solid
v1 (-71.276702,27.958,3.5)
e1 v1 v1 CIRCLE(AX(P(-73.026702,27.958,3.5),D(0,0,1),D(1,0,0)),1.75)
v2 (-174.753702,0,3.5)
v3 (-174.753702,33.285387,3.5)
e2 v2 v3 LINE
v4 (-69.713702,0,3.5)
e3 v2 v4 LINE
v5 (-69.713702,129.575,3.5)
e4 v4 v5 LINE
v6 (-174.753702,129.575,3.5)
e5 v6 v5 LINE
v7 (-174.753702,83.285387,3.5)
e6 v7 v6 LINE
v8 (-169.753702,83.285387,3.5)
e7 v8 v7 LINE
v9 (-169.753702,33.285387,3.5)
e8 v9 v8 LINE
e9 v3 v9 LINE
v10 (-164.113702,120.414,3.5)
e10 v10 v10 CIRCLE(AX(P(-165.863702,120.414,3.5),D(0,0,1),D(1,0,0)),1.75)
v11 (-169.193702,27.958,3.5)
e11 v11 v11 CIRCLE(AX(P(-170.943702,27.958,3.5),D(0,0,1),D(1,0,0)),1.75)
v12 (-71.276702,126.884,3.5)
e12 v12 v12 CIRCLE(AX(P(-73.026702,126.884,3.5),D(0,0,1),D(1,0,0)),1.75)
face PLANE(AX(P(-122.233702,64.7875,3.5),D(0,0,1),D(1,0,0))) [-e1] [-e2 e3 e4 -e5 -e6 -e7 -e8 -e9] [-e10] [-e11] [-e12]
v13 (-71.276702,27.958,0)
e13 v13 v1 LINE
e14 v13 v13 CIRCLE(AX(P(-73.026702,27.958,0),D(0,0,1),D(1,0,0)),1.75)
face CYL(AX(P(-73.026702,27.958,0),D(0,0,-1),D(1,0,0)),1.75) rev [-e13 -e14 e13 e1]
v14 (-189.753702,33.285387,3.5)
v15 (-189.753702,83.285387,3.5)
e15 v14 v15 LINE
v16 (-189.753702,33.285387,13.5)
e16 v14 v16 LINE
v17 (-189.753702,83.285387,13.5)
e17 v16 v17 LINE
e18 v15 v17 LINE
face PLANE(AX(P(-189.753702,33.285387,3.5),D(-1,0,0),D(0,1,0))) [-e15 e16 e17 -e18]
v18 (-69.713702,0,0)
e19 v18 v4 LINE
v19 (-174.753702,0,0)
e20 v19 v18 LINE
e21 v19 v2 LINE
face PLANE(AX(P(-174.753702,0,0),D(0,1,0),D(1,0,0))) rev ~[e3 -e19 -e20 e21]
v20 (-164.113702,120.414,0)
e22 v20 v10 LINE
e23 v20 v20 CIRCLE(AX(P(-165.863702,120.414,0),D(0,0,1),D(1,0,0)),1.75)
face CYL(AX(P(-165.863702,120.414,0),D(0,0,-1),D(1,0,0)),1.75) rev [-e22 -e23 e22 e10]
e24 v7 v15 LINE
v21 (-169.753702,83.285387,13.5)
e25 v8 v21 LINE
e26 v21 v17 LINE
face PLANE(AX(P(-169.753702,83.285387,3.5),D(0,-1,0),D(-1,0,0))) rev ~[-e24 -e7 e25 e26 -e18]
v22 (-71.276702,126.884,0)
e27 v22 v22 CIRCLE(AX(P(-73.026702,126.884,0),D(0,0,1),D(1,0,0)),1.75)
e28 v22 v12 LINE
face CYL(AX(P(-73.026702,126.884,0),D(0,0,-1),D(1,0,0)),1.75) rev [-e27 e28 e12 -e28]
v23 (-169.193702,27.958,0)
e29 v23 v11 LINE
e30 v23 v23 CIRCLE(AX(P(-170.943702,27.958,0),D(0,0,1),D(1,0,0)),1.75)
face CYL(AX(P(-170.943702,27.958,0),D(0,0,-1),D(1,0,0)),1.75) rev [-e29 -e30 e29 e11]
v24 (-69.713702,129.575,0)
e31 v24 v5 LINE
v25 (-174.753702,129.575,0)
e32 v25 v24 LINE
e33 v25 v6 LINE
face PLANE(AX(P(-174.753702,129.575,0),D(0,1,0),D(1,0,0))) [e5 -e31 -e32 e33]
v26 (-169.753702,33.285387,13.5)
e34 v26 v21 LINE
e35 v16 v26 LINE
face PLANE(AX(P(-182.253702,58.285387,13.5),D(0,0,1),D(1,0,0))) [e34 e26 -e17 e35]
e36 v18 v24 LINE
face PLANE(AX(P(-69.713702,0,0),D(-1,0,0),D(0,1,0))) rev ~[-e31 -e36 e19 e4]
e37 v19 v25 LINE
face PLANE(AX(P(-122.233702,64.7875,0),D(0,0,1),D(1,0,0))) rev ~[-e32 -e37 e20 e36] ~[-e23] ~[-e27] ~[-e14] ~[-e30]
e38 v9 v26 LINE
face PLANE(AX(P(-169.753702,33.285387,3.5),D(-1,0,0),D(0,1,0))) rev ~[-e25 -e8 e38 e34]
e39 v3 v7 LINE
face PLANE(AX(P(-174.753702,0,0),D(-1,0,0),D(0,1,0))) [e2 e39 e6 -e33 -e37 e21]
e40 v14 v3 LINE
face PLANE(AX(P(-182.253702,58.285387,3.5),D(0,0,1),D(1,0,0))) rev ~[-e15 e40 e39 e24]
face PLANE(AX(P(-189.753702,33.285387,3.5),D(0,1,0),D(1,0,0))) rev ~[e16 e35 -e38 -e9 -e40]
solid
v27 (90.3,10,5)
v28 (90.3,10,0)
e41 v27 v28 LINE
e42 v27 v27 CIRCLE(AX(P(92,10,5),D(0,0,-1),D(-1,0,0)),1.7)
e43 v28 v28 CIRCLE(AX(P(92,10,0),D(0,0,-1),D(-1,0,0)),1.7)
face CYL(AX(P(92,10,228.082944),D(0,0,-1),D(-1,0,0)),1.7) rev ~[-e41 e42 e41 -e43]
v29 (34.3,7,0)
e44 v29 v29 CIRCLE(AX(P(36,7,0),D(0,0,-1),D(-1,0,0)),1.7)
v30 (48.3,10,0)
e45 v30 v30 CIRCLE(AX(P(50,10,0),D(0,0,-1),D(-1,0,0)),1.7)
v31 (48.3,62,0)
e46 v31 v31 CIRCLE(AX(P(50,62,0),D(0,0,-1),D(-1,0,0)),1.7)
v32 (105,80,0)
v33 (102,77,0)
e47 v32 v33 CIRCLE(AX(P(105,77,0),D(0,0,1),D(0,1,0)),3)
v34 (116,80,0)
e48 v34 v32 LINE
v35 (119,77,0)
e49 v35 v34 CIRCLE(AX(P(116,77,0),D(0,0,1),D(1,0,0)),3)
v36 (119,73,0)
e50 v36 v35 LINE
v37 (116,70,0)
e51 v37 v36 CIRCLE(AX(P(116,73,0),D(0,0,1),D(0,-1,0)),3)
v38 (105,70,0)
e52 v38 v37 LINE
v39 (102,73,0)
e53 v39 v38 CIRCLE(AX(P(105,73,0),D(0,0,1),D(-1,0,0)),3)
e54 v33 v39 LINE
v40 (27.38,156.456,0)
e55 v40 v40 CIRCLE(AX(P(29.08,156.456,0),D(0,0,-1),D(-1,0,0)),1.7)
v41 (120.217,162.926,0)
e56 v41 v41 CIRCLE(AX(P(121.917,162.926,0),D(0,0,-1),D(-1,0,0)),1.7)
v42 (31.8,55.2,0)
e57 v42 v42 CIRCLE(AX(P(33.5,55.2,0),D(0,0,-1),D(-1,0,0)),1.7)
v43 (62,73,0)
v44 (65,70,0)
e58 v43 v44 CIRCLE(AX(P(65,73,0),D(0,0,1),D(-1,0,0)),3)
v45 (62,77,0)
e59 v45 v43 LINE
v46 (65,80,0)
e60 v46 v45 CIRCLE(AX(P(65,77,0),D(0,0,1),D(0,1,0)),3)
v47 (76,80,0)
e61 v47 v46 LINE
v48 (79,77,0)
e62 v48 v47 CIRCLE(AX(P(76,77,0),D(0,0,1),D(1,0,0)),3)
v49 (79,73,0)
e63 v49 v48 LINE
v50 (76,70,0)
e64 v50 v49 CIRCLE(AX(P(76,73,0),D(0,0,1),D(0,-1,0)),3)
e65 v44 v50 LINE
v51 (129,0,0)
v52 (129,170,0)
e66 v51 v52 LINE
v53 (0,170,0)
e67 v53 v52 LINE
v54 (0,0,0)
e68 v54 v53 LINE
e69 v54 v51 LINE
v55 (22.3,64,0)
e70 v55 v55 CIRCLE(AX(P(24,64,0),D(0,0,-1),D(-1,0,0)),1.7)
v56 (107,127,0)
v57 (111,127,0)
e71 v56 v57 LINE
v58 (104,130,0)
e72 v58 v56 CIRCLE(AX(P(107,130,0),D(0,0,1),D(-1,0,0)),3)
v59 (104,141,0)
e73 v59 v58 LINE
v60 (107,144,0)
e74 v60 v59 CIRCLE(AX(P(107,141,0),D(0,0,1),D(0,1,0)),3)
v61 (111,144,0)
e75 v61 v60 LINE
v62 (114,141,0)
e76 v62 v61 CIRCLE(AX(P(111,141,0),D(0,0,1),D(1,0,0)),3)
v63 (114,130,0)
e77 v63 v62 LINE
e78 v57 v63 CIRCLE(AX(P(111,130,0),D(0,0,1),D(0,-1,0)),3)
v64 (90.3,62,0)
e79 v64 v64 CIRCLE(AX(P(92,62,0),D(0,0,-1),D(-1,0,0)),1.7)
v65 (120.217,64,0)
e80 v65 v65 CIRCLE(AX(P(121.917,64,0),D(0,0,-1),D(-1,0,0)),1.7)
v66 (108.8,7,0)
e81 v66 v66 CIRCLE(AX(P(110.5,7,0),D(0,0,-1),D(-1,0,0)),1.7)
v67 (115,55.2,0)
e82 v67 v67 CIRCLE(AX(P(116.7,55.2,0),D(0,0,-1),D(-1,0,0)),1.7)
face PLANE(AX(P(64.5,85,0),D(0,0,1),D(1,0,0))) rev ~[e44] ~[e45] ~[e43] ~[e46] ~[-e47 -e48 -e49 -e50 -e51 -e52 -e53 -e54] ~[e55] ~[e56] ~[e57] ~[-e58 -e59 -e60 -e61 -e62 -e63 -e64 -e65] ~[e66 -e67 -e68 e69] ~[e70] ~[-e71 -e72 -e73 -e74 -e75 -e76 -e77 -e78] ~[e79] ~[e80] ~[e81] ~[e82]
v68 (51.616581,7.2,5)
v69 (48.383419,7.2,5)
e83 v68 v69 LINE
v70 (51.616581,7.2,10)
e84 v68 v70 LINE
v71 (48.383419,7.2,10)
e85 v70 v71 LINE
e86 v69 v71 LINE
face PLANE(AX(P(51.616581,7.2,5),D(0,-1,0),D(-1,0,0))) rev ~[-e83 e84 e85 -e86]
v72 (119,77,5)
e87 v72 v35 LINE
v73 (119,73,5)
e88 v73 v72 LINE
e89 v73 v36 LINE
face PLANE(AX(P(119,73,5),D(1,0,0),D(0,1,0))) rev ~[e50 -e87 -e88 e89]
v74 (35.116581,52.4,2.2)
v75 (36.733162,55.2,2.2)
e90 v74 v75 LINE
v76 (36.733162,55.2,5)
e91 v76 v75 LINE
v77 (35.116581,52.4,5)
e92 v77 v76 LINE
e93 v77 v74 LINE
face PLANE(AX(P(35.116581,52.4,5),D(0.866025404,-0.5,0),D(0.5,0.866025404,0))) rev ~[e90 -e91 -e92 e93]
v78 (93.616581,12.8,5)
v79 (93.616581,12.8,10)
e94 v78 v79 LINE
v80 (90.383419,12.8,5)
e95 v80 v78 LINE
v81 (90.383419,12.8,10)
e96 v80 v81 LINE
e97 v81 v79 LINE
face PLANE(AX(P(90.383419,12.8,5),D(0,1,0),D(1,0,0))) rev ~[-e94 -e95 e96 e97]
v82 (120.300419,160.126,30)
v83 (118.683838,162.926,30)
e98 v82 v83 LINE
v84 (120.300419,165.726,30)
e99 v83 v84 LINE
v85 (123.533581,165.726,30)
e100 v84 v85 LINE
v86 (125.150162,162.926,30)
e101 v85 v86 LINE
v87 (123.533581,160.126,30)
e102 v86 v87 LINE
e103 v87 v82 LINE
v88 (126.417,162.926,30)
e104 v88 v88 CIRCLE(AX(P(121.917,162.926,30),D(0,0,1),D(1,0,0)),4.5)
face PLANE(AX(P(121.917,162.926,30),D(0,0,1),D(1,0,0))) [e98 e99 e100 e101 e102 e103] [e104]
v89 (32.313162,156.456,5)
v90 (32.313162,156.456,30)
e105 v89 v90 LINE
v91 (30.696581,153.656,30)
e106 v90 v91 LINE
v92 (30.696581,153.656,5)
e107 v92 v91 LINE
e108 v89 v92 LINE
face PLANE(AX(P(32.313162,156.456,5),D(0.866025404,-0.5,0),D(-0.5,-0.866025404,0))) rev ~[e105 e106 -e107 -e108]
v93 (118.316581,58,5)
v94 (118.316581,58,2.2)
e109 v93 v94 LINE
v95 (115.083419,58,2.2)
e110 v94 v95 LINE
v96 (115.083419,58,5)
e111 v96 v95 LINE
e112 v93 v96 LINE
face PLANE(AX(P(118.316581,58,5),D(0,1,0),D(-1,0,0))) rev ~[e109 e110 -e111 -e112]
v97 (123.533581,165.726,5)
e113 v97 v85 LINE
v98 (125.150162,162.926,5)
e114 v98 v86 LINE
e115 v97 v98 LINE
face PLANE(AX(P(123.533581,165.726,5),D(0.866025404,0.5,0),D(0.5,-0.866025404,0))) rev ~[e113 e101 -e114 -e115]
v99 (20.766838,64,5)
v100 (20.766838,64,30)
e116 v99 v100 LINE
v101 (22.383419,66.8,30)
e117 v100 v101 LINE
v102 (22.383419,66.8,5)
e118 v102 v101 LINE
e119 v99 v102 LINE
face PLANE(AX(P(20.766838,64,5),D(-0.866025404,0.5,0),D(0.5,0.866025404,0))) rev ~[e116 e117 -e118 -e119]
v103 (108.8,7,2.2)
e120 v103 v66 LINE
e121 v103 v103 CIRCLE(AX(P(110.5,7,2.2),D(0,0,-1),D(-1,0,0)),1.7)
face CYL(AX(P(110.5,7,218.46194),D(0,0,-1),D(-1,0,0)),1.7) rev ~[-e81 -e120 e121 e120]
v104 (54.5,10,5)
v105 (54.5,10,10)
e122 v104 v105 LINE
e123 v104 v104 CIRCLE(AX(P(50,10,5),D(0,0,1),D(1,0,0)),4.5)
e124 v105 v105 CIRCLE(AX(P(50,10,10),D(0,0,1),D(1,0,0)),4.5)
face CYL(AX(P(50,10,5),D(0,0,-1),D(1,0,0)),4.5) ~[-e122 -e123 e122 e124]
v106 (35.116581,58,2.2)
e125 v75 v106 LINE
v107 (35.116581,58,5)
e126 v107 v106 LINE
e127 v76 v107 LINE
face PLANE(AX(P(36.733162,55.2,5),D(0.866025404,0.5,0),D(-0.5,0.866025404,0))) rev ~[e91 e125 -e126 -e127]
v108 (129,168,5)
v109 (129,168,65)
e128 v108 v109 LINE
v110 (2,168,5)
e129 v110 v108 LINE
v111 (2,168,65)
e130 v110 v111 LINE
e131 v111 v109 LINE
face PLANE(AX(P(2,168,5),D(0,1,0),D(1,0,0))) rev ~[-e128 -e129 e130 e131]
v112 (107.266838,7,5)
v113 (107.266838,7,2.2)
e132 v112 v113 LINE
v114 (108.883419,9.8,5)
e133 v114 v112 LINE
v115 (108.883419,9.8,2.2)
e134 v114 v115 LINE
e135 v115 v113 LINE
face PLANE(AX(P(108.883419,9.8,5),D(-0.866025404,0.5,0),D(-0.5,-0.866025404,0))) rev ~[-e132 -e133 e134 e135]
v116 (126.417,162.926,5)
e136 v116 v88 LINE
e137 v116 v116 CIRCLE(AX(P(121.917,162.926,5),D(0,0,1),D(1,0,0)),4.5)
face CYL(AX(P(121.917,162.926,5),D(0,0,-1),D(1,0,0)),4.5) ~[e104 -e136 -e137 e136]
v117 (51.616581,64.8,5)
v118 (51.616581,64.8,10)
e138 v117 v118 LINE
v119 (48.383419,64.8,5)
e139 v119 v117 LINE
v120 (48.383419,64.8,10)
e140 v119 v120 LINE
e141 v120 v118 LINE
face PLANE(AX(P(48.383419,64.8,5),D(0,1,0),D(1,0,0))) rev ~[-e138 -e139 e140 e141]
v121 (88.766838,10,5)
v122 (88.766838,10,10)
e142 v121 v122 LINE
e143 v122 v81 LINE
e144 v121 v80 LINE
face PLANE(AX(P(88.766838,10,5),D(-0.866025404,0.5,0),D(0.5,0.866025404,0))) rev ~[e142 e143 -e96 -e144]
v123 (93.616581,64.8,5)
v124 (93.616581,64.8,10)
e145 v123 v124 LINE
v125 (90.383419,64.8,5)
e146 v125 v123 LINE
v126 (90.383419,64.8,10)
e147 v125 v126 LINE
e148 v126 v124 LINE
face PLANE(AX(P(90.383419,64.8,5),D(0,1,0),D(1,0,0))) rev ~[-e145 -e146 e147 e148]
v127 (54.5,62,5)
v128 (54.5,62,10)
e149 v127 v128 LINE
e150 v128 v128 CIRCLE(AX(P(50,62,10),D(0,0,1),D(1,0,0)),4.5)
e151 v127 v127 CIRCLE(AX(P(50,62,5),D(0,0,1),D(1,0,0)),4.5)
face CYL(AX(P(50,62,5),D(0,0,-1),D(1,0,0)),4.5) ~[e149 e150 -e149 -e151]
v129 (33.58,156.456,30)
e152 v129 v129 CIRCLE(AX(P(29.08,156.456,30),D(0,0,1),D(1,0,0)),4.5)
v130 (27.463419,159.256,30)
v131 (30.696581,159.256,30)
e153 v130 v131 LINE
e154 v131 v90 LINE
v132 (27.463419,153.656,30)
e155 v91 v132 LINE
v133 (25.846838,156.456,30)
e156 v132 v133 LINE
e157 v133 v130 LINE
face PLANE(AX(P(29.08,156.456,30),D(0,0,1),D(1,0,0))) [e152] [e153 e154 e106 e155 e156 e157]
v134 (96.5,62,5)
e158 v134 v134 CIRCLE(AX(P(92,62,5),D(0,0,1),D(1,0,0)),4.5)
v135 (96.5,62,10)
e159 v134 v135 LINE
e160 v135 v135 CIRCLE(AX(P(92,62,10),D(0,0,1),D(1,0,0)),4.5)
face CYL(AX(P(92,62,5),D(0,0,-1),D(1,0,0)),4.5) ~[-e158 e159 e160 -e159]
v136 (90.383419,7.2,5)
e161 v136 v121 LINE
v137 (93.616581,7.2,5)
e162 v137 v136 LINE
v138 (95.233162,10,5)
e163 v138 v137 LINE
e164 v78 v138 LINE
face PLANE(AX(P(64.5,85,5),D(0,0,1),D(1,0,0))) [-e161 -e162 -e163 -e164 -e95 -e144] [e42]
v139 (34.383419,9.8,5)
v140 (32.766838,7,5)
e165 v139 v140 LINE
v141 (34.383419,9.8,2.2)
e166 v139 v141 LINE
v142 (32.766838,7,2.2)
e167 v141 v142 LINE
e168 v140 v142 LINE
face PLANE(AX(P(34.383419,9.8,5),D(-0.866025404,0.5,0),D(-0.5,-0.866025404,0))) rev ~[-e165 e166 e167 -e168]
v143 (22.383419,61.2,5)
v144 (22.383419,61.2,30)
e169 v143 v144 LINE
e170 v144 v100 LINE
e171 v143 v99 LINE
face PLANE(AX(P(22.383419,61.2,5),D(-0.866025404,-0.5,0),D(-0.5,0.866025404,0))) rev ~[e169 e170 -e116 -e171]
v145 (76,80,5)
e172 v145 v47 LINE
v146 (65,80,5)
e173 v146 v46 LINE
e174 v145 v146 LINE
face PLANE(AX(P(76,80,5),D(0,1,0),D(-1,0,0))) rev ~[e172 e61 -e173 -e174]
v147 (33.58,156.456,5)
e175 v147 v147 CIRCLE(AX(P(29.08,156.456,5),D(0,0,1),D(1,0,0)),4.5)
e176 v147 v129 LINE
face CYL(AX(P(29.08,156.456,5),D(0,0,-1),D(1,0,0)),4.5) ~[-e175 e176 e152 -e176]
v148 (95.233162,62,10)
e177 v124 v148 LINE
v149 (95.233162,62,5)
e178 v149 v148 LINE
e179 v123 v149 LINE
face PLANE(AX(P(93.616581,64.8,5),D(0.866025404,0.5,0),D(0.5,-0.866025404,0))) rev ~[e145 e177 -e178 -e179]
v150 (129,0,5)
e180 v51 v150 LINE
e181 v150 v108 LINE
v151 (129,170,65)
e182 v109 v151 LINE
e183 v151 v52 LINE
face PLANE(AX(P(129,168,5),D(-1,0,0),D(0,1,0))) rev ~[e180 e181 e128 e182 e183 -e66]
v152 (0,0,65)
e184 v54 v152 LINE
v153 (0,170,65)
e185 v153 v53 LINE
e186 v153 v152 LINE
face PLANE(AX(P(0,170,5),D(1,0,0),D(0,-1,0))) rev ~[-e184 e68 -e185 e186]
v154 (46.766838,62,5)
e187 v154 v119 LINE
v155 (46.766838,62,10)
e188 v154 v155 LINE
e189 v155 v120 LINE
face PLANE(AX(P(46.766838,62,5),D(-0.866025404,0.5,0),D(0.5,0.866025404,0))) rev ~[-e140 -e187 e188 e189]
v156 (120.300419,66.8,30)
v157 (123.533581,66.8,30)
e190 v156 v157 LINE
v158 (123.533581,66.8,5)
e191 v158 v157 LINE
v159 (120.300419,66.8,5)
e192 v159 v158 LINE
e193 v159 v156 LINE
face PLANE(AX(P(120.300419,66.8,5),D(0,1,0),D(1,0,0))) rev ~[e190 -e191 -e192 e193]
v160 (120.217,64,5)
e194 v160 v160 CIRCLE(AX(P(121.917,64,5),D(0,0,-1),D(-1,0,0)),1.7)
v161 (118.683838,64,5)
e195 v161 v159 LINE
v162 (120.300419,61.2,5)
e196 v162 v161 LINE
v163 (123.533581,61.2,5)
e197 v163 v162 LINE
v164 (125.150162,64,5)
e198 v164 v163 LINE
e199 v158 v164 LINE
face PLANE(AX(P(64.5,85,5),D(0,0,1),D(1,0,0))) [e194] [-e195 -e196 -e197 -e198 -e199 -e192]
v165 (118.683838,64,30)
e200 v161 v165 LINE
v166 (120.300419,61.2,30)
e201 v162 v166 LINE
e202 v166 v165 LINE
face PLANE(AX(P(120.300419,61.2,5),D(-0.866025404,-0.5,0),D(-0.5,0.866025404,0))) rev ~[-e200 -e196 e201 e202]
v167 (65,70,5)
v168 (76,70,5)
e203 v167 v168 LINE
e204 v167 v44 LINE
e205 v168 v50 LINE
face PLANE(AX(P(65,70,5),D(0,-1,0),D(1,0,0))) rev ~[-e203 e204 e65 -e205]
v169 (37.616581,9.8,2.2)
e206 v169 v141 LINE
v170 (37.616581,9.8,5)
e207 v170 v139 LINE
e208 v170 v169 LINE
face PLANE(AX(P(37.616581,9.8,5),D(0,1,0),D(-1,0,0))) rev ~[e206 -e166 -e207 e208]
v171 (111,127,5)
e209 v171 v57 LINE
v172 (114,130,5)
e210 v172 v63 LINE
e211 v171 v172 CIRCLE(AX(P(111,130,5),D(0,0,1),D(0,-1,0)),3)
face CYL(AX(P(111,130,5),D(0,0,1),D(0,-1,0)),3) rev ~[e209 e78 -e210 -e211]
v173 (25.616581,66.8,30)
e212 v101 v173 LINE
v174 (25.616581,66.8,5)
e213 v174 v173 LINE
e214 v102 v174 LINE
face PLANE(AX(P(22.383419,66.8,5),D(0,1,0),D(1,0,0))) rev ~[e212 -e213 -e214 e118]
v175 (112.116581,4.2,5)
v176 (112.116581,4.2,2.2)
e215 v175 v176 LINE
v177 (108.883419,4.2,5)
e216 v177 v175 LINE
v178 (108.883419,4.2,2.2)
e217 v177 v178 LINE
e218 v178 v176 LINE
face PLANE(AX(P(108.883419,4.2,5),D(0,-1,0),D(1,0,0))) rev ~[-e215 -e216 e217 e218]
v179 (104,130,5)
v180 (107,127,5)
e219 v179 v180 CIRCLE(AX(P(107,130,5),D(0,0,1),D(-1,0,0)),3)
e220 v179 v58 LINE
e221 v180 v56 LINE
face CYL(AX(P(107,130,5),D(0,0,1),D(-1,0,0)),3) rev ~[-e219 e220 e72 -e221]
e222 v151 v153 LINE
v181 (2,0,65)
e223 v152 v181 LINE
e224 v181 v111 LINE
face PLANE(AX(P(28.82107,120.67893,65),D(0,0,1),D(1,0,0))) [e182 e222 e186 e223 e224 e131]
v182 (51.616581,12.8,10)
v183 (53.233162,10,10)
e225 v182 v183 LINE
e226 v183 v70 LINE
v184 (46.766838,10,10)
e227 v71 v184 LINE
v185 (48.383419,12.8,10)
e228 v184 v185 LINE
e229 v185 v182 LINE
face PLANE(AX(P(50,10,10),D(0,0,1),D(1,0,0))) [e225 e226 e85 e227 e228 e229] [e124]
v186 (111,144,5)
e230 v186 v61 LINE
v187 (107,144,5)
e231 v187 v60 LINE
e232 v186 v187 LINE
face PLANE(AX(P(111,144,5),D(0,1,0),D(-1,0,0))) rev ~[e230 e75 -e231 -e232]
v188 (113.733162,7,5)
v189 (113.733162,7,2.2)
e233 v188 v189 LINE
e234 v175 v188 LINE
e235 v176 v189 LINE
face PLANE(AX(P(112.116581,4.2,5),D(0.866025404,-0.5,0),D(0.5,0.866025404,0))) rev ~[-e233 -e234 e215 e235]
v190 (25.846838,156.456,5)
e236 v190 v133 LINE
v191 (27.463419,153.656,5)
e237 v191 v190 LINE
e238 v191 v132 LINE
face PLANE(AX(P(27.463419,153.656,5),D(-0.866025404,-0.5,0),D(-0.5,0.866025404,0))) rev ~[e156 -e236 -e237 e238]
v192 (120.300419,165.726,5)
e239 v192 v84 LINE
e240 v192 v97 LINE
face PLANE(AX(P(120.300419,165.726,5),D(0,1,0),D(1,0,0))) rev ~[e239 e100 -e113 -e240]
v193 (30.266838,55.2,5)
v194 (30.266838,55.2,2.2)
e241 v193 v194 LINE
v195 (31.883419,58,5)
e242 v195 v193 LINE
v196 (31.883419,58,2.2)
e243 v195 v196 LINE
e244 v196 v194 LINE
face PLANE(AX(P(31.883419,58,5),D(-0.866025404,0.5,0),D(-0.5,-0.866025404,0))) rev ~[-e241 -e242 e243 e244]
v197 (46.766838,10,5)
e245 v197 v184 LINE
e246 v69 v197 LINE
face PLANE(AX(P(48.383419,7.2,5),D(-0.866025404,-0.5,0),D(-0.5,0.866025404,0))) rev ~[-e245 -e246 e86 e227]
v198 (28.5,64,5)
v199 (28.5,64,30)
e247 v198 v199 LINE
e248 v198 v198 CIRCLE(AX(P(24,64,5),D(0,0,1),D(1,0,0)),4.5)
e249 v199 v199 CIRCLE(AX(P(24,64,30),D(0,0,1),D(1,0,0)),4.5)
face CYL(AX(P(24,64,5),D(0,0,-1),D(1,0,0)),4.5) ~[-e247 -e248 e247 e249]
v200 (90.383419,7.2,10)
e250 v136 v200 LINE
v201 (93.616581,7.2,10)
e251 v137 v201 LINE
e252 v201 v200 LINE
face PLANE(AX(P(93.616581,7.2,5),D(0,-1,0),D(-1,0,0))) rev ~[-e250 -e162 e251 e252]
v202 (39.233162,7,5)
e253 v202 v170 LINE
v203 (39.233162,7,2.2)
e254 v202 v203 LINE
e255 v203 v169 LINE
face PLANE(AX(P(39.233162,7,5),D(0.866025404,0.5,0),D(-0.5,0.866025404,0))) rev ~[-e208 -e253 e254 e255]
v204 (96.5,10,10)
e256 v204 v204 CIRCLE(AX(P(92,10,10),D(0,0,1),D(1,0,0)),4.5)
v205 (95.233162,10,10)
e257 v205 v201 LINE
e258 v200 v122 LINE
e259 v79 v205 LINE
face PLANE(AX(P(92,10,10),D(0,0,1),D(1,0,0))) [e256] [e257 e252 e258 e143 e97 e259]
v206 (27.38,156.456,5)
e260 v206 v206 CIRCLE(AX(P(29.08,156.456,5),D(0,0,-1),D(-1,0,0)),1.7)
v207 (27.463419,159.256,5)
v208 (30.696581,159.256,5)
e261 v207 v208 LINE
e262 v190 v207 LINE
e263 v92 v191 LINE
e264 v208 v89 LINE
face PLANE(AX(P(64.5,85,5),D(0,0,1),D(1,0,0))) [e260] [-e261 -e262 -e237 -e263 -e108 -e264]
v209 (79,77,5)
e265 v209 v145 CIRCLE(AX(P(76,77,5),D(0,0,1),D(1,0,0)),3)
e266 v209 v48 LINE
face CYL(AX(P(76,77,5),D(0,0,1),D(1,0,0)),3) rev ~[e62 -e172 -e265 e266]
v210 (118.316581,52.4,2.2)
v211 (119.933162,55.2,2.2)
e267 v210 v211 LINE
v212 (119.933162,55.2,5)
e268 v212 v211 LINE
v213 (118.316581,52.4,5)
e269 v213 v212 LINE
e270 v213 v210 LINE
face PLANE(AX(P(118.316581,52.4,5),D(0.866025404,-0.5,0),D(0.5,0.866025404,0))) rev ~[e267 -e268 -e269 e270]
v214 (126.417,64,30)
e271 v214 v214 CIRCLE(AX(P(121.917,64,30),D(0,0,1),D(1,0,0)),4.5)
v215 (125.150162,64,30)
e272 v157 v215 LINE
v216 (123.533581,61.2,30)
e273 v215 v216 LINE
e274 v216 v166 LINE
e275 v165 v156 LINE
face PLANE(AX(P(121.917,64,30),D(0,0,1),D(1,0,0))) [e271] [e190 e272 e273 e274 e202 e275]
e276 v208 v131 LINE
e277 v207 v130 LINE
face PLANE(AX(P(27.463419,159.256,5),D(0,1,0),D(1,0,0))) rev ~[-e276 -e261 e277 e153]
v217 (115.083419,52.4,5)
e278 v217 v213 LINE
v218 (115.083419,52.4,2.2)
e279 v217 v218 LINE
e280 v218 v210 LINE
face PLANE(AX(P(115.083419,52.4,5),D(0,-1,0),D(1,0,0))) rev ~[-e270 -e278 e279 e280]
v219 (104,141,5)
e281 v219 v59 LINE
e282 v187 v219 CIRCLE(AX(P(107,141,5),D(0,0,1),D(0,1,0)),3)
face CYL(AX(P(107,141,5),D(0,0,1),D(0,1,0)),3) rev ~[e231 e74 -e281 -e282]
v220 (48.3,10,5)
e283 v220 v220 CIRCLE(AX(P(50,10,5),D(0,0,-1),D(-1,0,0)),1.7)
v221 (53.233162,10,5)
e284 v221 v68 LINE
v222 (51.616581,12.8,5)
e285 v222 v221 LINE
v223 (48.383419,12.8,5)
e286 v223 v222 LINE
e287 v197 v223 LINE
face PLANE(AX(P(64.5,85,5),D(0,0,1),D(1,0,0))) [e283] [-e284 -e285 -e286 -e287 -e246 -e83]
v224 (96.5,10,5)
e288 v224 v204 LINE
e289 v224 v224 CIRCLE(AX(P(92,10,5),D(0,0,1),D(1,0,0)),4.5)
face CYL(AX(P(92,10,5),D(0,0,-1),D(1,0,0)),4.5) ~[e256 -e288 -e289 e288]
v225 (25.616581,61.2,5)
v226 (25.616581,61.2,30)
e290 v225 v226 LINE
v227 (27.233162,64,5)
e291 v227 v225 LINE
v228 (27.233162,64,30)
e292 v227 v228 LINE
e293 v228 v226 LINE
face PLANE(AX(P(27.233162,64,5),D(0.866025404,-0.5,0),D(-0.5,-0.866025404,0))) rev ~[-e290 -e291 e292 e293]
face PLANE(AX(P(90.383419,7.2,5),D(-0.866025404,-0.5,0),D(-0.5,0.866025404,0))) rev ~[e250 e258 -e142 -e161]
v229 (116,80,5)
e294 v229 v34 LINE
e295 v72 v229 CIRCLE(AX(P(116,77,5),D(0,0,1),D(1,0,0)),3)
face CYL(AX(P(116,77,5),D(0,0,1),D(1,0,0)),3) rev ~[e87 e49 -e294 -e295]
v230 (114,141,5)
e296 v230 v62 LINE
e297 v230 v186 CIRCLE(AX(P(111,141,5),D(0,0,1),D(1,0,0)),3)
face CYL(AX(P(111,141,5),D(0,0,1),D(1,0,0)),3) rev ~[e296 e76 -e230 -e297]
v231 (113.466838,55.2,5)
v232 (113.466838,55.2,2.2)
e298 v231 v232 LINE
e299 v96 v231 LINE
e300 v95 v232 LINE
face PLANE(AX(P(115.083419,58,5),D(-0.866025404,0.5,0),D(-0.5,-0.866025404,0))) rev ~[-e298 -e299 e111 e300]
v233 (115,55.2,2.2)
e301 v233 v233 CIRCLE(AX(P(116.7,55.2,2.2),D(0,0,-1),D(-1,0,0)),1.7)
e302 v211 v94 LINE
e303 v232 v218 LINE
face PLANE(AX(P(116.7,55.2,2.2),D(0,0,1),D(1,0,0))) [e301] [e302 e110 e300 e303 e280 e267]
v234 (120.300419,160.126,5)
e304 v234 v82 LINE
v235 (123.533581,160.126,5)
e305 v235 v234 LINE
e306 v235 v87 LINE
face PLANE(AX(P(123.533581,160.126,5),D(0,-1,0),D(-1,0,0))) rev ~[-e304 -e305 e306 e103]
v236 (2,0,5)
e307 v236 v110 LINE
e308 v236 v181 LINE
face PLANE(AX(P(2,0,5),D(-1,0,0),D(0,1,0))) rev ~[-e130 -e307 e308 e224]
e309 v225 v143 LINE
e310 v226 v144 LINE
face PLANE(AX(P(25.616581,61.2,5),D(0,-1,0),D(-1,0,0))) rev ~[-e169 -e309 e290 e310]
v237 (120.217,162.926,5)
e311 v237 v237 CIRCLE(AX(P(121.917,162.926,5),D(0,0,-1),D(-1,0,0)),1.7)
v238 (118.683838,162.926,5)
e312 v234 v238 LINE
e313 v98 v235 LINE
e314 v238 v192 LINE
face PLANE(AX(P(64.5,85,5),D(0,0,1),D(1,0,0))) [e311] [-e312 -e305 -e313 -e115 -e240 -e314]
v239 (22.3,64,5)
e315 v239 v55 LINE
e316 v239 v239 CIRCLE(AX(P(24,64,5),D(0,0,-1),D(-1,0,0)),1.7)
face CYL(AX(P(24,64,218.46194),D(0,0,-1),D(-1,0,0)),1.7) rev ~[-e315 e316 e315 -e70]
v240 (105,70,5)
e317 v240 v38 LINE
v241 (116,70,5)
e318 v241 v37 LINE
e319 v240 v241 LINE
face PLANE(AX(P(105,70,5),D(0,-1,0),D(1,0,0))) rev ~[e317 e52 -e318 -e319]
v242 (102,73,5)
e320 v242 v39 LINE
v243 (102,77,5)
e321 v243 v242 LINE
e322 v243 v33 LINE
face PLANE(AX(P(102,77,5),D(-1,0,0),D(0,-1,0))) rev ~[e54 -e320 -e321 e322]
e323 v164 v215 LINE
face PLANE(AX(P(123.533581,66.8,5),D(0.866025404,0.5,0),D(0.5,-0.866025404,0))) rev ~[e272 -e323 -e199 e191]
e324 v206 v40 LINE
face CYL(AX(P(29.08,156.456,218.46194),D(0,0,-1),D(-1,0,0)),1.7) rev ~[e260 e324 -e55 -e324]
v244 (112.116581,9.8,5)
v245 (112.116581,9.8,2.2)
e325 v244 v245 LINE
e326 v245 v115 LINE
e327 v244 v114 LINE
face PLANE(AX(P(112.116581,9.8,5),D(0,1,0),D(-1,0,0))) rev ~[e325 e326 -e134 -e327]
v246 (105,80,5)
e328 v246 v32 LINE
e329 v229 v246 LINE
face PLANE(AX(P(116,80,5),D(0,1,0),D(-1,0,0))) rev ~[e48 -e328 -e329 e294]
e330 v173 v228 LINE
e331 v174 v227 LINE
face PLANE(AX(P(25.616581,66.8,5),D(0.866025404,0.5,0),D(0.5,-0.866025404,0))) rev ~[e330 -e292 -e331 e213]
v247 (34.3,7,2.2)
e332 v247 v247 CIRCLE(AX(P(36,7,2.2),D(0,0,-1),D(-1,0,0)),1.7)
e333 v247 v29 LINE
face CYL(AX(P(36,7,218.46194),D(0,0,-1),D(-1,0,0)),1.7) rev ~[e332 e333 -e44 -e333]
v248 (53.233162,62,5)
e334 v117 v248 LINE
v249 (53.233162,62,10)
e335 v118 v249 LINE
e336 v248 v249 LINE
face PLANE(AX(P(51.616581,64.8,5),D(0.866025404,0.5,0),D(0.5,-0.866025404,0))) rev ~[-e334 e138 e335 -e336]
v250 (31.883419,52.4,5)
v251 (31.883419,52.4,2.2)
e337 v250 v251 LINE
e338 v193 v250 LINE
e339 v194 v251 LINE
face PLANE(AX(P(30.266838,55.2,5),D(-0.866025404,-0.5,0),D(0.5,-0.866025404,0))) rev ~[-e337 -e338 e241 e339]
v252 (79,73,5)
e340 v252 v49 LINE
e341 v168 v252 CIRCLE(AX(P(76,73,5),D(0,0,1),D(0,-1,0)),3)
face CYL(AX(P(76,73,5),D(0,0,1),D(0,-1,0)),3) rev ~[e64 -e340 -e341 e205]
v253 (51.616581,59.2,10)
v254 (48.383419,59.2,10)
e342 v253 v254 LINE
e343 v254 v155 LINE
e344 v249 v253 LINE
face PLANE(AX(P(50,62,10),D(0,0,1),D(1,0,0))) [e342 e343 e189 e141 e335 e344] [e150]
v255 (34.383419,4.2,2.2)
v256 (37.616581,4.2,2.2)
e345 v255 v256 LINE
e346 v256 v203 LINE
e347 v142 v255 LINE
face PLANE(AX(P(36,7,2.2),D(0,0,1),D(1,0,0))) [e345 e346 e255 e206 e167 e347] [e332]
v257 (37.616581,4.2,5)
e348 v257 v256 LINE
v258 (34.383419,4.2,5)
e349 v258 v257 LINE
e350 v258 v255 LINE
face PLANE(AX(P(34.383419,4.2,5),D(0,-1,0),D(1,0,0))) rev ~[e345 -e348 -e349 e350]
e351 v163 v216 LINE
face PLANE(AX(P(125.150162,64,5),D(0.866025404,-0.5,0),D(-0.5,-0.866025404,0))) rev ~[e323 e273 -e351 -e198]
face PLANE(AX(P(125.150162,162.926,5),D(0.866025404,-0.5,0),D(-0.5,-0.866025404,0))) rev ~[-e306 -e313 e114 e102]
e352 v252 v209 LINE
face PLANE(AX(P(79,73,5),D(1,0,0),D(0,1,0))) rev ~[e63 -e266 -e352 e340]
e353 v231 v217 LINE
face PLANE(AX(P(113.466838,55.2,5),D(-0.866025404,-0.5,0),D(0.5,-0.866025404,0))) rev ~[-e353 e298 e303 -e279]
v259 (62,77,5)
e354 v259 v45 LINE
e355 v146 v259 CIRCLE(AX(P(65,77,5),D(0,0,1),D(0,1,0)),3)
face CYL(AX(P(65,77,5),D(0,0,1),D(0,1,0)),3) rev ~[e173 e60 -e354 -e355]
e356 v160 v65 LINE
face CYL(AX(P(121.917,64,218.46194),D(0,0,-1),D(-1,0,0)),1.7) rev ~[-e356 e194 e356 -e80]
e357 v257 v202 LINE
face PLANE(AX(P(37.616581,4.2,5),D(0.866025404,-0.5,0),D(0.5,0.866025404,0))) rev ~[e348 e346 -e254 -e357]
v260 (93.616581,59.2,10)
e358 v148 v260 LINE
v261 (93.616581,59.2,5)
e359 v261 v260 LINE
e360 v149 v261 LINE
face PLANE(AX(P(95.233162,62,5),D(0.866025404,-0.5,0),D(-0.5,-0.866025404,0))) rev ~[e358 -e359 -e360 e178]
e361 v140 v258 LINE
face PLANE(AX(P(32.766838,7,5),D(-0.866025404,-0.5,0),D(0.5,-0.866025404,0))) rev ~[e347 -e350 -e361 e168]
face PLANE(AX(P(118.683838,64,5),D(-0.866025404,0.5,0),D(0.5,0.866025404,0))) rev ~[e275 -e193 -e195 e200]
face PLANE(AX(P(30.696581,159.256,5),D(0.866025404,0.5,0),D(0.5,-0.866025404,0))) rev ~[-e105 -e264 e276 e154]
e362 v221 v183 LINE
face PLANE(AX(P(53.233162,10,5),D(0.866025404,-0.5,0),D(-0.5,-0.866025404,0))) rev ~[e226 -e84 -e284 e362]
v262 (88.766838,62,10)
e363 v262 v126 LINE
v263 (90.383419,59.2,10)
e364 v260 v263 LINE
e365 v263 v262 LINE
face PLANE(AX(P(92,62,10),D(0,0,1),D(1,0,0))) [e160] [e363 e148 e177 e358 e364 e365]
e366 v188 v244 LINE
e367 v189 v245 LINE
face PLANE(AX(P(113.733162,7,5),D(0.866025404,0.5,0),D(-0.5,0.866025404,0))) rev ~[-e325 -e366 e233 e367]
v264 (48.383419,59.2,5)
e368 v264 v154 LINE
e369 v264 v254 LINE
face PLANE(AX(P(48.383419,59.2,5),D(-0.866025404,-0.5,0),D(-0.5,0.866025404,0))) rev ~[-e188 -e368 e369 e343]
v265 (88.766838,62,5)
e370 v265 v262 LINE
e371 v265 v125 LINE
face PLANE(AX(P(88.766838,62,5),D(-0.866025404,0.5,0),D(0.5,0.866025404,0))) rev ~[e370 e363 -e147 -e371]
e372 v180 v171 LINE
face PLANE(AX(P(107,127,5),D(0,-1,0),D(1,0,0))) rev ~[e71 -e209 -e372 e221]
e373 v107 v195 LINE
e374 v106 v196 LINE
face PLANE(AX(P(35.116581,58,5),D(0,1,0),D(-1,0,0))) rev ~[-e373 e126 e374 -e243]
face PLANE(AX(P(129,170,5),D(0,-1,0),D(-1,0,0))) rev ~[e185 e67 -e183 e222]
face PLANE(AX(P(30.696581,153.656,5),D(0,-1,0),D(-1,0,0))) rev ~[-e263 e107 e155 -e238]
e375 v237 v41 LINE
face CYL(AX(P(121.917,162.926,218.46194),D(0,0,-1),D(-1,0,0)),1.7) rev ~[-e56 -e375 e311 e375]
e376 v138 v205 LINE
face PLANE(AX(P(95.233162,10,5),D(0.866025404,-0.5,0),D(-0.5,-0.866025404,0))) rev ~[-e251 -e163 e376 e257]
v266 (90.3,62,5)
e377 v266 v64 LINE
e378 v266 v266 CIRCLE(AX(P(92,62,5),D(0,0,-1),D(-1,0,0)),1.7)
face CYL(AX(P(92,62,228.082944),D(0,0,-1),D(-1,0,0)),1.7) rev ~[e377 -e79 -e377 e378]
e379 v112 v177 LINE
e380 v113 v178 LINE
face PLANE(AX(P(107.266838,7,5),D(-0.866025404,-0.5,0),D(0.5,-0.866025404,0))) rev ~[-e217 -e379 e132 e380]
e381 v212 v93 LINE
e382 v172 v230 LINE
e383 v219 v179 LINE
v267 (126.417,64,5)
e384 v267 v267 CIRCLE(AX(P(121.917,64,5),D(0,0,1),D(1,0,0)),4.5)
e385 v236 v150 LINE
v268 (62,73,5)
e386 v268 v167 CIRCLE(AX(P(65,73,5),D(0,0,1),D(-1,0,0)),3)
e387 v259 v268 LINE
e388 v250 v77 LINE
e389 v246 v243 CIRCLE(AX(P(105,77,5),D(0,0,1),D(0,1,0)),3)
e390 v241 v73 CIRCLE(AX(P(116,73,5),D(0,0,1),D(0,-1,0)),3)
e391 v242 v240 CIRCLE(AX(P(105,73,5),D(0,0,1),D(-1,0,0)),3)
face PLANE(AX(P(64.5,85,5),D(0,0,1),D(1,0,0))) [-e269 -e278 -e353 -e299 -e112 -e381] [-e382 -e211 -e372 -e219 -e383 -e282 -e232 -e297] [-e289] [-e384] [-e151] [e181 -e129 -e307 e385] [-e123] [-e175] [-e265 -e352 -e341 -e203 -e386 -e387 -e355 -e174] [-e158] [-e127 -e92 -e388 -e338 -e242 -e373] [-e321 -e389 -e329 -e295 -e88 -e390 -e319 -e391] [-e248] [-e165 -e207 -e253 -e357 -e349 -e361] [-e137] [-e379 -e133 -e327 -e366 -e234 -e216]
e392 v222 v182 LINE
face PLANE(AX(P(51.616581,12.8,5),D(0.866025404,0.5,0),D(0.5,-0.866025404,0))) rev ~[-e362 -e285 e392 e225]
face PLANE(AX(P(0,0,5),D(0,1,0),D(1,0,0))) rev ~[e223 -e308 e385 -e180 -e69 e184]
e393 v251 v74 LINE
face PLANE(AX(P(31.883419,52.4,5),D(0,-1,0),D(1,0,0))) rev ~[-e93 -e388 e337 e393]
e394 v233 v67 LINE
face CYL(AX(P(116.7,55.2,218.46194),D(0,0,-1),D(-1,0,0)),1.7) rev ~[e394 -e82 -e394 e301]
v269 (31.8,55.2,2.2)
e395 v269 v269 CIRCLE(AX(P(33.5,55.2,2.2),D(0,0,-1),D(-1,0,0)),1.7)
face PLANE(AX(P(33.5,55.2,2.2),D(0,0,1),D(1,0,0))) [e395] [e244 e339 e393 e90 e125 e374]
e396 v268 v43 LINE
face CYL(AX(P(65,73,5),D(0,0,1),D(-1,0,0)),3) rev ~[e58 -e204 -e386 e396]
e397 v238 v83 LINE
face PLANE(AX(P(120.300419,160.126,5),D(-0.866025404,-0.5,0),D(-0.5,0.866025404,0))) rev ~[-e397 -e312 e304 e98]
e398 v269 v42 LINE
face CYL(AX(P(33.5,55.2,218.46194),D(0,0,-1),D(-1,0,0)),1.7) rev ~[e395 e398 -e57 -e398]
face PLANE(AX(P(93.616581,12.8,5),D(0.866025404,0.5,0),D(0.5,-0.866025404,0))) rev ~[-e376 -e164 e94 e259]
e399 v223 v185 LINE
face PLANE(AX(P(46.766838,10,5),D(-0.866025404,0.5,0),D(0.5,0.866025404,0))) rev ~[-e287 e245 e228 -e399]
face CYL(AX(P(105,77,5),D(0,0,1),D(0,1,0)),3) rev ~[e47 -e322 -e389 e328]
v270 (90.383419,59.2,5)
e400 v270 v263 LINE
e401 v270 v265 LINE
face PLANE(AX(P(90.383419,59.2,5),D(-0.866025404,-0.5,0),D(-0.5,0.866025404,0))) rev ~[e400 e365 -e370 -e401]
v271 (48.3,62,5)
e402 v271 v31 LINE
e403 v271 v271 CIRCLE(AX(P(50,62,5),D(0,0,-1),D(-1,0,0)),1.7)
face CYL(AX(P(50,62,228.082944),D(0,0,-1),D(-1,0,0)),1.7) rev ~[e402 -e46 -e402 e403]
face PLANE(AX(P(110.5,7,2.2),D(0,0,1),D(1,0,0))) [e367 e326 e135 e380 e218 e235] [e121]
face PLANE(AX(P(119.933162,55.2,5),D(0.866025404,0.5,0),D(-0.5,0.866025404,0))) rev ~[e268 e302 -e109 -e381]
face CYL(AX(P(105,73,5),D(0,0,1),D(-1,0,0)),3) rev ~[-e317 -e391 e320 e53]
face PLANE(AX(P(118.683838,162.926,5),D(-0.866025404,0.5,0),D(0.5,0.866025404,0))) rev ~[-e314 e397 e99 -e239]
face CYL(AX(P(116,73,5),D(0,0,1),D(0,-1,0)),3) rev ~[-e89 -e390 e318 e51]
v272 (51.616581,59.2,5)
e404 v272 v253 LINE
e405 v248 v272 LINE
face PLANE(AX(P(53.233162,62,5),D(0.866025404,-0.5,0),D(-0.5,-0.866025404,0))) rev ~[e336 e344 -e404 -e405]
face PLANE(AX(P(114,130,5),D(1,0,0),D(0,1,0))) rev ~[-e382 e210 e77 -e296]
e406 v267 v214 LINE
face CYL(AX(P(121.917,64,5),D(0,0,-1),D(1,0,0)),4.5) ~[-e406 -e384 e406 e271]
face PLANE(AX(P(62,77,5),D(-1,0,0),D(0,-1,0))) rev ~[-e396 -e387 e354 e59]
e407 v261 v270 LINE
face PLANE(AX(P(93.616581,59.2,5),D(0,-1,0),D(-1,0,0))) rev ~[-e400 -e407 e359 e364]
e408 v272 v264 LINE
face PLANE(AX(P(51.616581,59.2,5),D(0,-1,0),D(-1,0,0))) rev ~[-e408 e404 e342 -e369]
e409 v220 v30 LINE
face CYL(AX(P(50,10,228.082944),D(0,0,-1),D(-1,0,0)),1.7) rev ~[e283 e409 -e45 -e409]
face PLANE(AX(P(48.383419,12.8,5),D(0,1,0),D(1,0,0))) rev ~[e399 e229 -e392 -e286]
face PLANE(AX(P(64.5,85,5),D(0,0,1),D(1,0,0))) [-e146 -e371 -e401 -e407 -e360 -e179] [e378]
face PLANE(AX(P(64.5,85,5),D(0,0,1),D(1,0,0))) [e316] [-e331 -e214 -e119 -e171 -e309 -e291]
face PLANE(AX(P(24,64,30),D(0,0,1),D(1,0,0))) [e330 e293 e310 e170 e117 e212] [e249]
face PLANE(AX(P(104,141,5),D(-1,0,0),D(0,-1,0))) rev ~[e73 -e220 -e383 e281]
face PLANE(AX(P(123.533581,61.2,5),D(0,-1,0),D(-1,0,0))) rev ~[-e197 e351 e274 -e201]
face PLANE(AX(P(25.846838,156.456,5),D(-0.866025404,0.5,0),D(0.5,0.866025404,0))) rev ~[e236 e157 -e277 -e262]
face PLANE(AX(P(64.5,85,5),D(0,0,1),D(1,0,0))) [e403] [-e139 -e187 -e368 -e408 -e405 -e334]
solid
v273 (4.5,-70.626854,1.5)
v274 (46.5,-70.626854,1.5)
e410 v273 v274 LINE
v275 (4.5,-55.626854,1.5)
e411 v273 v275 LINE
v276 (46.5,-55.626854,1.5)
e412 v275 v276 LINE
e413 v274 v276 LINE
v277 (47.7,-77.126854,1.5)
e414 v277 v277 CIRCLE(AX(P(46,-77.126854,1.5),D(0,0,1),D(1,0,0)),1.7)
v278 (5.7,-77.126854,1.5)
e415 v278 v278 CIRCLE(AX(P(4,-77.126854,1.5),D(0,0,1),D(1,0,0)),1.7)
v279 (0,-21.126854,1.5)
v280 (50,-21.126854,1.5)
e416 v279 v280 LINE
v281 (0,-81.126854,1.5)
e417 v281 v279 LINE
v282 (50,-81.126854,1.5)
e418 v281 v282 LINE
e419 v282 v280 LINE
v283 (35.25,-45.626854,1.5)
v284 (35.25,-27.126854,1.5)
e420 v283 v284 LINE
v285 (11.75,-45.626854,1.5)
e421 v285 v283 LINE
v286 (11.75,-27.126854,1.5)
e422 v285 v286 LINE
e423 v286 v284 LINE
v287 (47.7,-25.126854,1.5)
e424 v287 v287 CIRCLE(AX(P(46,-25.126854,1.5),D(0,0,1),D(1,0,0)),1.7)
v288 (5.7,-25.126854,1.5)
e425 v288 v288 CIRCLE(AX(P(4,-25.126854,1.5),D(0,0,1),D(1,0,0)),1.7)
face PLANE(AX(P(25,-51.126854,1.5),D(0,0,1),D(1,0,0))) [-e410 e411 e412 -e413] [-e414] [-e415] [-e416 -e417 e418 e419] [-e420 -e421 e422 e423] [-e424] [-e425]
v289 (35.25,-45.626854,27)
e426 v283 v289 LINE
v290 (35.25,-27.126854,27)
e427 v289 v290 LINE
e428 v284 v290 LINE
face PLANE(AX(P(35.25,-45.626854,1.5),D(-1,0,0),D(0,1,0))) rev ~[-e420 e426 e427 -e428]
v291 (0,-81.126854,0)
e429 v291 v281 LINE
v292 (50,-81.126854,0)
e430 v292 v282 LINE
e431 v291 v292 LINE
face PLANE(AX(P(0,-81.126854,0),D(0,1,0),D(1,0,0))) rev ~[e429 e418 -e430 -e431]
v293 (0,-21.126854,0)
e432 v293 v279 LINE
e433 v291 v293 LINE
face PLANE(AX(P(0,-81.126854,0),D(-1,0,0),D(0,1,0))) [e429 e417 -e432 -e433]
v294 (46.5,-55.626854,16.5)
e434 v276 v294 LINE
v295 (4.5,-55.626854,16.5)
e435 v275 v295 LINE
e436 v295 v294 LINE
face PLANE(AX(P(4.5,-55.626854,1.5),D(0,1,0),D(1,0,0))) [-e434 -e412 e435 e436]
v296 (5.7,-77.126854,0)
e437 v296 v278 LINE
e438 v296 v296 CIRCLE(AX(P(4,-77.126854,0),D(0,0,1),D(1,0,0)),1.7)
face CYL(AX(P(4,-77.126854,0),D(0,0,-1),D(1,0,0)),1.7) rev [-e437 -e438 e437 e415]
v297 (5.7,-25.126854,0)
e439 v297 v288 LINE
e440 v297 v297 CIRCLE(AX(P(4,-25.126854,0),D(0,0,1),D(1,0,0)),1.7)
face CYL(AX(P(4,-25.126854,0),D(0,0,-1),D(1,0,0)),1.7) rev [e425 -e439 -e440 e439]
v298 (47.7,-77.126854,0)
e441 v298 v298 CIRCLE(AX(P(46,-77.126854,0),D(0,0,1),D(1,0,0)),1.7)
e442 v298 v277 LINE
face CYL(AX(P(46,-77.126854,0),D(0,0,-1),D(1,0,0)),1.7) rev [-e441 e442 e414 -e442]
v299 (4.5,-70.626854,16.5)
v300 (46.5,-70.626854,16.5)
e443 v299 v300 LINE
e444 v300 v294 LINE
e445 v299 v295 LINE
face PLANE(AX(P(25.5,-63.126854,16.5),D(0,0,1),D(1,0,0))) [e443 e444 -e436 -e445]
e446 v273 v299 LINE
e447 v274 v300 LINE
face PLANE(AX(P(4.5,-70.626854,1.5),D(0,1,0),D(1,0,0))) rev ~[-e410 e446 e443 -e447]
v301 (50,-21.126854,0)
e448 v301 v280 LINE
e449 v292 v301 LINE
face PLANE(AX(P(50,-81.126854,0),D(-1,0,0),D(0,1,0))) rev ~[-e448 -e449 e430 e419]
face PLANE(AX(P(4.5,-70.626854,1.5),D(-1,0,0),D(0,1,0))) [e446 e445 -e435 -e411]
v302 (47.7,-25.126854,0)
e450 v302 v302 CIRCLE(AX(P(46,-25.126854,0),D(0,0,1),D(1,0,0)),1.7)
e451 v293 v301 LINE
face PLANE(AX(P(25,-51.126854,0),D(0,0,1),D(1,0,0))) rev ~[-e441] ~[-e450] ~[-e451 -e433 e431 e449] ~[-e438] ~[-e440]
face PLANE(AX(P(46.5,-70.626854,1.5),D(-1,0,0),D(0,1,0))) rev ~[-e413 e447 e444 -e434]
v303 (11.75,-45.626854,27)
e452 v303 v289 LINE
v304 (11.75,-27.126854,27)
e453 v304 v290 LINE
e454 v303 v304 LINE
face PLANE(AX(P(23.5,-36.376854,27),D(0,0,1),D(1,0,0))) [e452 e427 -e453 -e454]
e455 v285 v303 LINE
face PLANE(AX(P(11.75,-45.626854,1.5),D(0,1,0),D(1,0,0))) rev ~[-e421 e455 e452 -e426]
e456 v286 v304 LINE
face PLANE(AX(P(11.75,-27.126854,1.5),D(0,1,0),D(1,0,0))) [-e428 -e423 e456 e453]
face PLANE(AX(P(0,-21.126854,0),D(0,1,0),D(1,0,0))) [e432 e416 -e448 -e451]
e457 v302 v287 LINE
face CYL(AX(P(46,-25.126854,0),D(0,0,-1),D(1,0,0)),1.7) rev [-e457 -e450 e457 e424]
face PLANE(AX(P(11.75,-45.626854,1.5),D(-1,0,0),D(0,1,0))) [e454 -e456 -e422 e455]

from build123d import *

# Parameters (mm, degrees)
F2_W      = 105.04
F2_H      = 129.575
F2_R      = 1.75
F3_DEPTH  = 3.5
F4_W      = 15
F4_H      = 50
F4_W_2    = 5
F5_DEPTH  = 10
F6_W      = 50
F6_H      = 60
F6_R      = 1.7
F7_DEPTH  = 1.5
F8_W      = 42
F8_H      = 15
F9_DEPTH  = 15
F10_W     = 23.5
F10_H     = 18.5
F11_DEPTH = 25.5
F12_W     = 129
F12_H     = 170
F13_DEPTH = 5
F15_D     = 3.4
F16_DEPTH = 2.8
F18_D     = 3.4
F17_R     = 4.5
F19_DEPTH = 25
F21_DEPTH = 60
F23_D     = 3.4
F22_R     = 4.5
F24_DEPTH = 5
F26_DEPTH = 10


# Not quite as in the source:
# - a feature names something its author has since deleted; it is built from what else it names


with BuildPart() as f3:
    # F2 (on Top) → F3 (new body)
    with BuildSketch(Plane.XY):
        with Locations((-122.2337017008, 64.7875)):
            Rectangle(F2_W, F2_H)
        with Locations((-170.9437017008, 27.958)):
            Circle(F2_R, mode=Mode.SUBTRACT)
        with Locations((-73.0267017008, 27.958)):
            Circle(F2_R, mode=Mode.SUBTRACT)
        with Locations((-165.8637017008, 120.414)):
            Circle(F2_R, mode=Mode.SUBTRACT)
        with Locations((-73.0267017008, 126.884)):
            Circle(F2_R, mode=Mode.SUBTRACT)
    extrude(amount=F3_DEPTH)

    # F4 (on face) → F5 (join)
    with BuildSketch(Plane.XY.offset(3.5)):
        with Locations((-182.2537017008, 58.2853868604)):
            Rectangle(F4_W, F4_H)
        with Locations((-172.2537017008, 58.2853868604)):
            Rectangle(F4_W_2, F4_H)
    extrude(amount=F5_DEPTH)


with BuildPart() as f7:
    # F6 (on Top) → F7 (new body)
    with BuildSketch(Plane.XY):
        with Locations((25, -51.1268538237)):
            Rectangle(F6_W, F6_H)
        with Locations((4, -77.1268538237)):
            Circle(F6_R, mode=Mode.SUBTRACT)
        with Locations((46, -77.1268538237)):
            Circle(F6_R, mode=Mode.SUBTRACT)
        with Locations((4, -25.1268538237)):
            Circle(F6_R, mode=Mode.SUBTRACT)
        with Locations((46, -25.1268538237)):
            Circle(F6_R, mode=Mode.SUBTRACT)
    extrude(amount=F7_DEPTH)

    # F8 (on face) → F9 (join)
    with BuildSketch(Plane.XY.offset(1.5)):
        with Locations((25.5, -63.1268538237)):
            Rectangle(F8_W, F8_H)
    extrude(amount=F9_DEPTH)

    # F10 (on face) → F11 (join)
    with BuildSketch(Plane.XY.offset(1.5)):
        with Locations((23.5, -36.3768538237)):
            Rectangle(F10_W, F10_H)
    extrude(amount=F11_DEPTH)


with BuildPart() as f13:
    # F12 (on Top) → F13 (new body)
    with BuildSketch(Plane.XY):
        with Locations((64.5, 85)):
            Rectangle(F12_W, F12_H)
    extrude(amount=F13_DEPTH)

    # F15 (through all)
    with Locations(Plane.XY.offset(5)):
        with Locations((33.5, 55.2), (116.7, 55.2), (110.5, 7), (36, 7)):
            Hole(F15_D / 2)

    # F14 (on face) → F16 (cut)
    with BuildSketch(Plane.XY.offset(5)):
        Polygon((35.1165807537, 58), (31.8834192463, 58), (30.2668384925, 55.2), (31.8834192463, 52.4), (35.1165807537, 52.4), (36.7331615075, 55.2), align=None)
        Polygon((118.3165807537, 58), (115.0834192463, 58), (113.4668384925, 55.2), (115.0834192463, 52.4), (118.3165807537, 52.4), (119.9331615075, 55.2), align=None)
        Polygon((112.1165807537, 9.8), (108.8834192463, 9.8), (107.2668384925, 7), (108.8834192463, 4.2), (112.1165807537, 4.2), (113.7331615075, 7), align=None)
        Polygon((37.6165807537, 9.8), (34.3834192463, 9.8), (32.7668384925, 7), (34.3834192463, 4.2), (37.6165807537, 4.2), (39.2331615075, 7), align=None)
    extrude(amount=-F16_DEPTH, mode=Mode.SUBTRACT)

    # F18 (through all)
    with Locations(Plane.XY.offset(5)):
        with Locations((29.08, 156.456), (121.917, 162.926), (121.917, 64), (24, 64)):
            Hole(F18_D / 2)

    # F17 (on face) → F19 (join)
    with BuildSketch(Plane.XY.offset(5)):
        with Locations((29.08, 156.456)):
            Circle(F17_R)
        Polygon((25.8468384925, 156.456), (27.4634192463, 159.256), (30.6965807537, 159.256), (32.3131615075, 156.456), (30.6965807537, 153.656), (27.4634192463, 153.656), align=None, mode=Mode.SUBTRACT)
        with Locations((121.917, 162.926)):
            Circle(F17_R)
        Polygon((118.6838384925, 162.926), (120.3004192463, 165.726), (123.5335807537, 165.726), (125.1501615075, 162.926), (123.5335807537, 160.126), (120.3004192463, 160.126), align=None, mode=Mode.SUBTRACT)
        with Locations((24, 64)):
            Circle(F17_R)
        Polygon((20.7668384925, 64), (22.3834192463, 66.8), (25.6165807537, 66.8), (27.2331615075, 64), (25.6165807537, 61.2), (22.3834192463, 61.2), align=None, mode=Mode.SUBTRACT)
        with Locations((121.917, 64)):
            Circle(F17_R)
        Polygon((118.6838384925, 64), (120.3004192463, 66.8), (123.5335807537, 66.8), (125.1501615075, 64), (123.5335807537, 61.2), (120.3004192463, 61.2), align=None, mode=Mode.SUBTRACT)
    extrude(amount=F19_DEPTH)

    # F20 (on face) → F21 (join)
    with BuildSketch(Plane.XY.offset(5)):
        Polygon((0, 170), (0, 0), (2, 0), (2, 168), (129, 168), (129, 170), align=None)
    extrude(amount=F21_DEPTH)

    # F23 (through all)
    with Locations(Plane.XY.offset(5)):
        with Locations((50, 62), (92, 62), (92, 10), (50, 10)):
            Hole(F23_D / 2)

    # F22 (on face) → F24 (join)
    with BuildSketch(Plane.XY.offset(5)):
        with Locations((50, 10)):
            Circle(F22_R)
        Polygon((46.7668384925, 10), (48.3834192463, 12.8), (51.6165807537, 12.8), (53.2331615075, 10), (51.6165807537, 7.2), (48.3834192463, 7.2), align=None, mode=Mode.SUBTRACT)
        with Locations((92, 10)):
            Circle(F22_R)
        Polygon((88.7668384925, 10), (90.3834192463, 12.8), (93.6165807537, 12.8), (95.2331615075, 10), (93.6165807537, 7.2), (90.3834192463, 7.2), align=None, mode=Mode.SUBTRACT)
        with Locations((50, 62)):
            Circle(F22_R)
        Polygon((46.7668384925, 62), (48.3834192463, 64.8), (51.6165807537, 64.8), (53.2331615075, 62), (51.6165807537, 59.2), (48.3834192463, 59.2), align=None, mode=Mode.SUBTRACT)
        with Locations((92, 62)):
            Circle(F22_R)
        Polygon((88.7668384925, 62), (90.3834192463, 64.8), (93.6165807537, 64.8), (95.2331615075, 62), (93.6165807537, 59.2), (90.3834192463, 59.2), align=None, mode=Mode.SUBTRACT)
    extrude(amount=F24_DEPTH)

    # F25 (on face) → F26 (cut)
    with BuildSketch(Plane.XY.offset(5)):
        with BuildLine():
            ThreePointArc((62, 73), (62.8786796564, 70.8786796564), (65, 70))
            Line((65, 70), (76, 70))
            ThreePointArc((76, 70), (78.1213203436, 70.8786796564), (79, 73))
            Line((79, 73), (79, 77))
            ThreePointArc((79, 77), (78.1213203436, 79.1213203436), (76, 80))
            Line((76, 80), (65, 80))
            ThreePointArc((65, 80), (62.8786796564, 79.1213203436), (62, 77))
            Line((62, 77), (62, 73))
        make_face()
        with BuildLine():
            Line((116, 80), (105, 80))
            ThreePointArc((105, 80), (102.8786796564, 79.1213203436), (102, 77))
            Line((102, 77), (102, 73))
            ThreePointArc((102, 73), (102.8786796564, 70.8786796564), (105, 70))
            Line((105, 70), (116, 70))
            ThreePointArc((116, 70), (118.1213203436, 70.8786796564), (119, 73))
            Line((119, 73), (119, 77))
            ThreePointArc((119, 77), (118.1213203436, 79.1213203436), (116, 80))
        make_face()
        with BuildLine():
            ThreePointArc((104, 130), (104.8786796564, 127.8786796564), (107, 127))
            Line((107, 127), (111, 127))
            ThreePointArc((111, 127), (113.1213203436, 127.8786796564), (114, 130))
            Line((114, 130), (114, 141))
            ThreePointArc((114, 141), (113.1213203436, 143.1213203436), (111, 144))
            Line((111, 144), (107, 144))
            ThreePointArc((107, 144), (104.8786796564, 143.1213203436), (104, 141))
            Line((104, 141), (104, 130))
        make_face()
    extrude(amount=-F26_DEPTH, mode=Mode.SUBTRACT)


solid = Compound([f3.part, f7.part, f13.part])
